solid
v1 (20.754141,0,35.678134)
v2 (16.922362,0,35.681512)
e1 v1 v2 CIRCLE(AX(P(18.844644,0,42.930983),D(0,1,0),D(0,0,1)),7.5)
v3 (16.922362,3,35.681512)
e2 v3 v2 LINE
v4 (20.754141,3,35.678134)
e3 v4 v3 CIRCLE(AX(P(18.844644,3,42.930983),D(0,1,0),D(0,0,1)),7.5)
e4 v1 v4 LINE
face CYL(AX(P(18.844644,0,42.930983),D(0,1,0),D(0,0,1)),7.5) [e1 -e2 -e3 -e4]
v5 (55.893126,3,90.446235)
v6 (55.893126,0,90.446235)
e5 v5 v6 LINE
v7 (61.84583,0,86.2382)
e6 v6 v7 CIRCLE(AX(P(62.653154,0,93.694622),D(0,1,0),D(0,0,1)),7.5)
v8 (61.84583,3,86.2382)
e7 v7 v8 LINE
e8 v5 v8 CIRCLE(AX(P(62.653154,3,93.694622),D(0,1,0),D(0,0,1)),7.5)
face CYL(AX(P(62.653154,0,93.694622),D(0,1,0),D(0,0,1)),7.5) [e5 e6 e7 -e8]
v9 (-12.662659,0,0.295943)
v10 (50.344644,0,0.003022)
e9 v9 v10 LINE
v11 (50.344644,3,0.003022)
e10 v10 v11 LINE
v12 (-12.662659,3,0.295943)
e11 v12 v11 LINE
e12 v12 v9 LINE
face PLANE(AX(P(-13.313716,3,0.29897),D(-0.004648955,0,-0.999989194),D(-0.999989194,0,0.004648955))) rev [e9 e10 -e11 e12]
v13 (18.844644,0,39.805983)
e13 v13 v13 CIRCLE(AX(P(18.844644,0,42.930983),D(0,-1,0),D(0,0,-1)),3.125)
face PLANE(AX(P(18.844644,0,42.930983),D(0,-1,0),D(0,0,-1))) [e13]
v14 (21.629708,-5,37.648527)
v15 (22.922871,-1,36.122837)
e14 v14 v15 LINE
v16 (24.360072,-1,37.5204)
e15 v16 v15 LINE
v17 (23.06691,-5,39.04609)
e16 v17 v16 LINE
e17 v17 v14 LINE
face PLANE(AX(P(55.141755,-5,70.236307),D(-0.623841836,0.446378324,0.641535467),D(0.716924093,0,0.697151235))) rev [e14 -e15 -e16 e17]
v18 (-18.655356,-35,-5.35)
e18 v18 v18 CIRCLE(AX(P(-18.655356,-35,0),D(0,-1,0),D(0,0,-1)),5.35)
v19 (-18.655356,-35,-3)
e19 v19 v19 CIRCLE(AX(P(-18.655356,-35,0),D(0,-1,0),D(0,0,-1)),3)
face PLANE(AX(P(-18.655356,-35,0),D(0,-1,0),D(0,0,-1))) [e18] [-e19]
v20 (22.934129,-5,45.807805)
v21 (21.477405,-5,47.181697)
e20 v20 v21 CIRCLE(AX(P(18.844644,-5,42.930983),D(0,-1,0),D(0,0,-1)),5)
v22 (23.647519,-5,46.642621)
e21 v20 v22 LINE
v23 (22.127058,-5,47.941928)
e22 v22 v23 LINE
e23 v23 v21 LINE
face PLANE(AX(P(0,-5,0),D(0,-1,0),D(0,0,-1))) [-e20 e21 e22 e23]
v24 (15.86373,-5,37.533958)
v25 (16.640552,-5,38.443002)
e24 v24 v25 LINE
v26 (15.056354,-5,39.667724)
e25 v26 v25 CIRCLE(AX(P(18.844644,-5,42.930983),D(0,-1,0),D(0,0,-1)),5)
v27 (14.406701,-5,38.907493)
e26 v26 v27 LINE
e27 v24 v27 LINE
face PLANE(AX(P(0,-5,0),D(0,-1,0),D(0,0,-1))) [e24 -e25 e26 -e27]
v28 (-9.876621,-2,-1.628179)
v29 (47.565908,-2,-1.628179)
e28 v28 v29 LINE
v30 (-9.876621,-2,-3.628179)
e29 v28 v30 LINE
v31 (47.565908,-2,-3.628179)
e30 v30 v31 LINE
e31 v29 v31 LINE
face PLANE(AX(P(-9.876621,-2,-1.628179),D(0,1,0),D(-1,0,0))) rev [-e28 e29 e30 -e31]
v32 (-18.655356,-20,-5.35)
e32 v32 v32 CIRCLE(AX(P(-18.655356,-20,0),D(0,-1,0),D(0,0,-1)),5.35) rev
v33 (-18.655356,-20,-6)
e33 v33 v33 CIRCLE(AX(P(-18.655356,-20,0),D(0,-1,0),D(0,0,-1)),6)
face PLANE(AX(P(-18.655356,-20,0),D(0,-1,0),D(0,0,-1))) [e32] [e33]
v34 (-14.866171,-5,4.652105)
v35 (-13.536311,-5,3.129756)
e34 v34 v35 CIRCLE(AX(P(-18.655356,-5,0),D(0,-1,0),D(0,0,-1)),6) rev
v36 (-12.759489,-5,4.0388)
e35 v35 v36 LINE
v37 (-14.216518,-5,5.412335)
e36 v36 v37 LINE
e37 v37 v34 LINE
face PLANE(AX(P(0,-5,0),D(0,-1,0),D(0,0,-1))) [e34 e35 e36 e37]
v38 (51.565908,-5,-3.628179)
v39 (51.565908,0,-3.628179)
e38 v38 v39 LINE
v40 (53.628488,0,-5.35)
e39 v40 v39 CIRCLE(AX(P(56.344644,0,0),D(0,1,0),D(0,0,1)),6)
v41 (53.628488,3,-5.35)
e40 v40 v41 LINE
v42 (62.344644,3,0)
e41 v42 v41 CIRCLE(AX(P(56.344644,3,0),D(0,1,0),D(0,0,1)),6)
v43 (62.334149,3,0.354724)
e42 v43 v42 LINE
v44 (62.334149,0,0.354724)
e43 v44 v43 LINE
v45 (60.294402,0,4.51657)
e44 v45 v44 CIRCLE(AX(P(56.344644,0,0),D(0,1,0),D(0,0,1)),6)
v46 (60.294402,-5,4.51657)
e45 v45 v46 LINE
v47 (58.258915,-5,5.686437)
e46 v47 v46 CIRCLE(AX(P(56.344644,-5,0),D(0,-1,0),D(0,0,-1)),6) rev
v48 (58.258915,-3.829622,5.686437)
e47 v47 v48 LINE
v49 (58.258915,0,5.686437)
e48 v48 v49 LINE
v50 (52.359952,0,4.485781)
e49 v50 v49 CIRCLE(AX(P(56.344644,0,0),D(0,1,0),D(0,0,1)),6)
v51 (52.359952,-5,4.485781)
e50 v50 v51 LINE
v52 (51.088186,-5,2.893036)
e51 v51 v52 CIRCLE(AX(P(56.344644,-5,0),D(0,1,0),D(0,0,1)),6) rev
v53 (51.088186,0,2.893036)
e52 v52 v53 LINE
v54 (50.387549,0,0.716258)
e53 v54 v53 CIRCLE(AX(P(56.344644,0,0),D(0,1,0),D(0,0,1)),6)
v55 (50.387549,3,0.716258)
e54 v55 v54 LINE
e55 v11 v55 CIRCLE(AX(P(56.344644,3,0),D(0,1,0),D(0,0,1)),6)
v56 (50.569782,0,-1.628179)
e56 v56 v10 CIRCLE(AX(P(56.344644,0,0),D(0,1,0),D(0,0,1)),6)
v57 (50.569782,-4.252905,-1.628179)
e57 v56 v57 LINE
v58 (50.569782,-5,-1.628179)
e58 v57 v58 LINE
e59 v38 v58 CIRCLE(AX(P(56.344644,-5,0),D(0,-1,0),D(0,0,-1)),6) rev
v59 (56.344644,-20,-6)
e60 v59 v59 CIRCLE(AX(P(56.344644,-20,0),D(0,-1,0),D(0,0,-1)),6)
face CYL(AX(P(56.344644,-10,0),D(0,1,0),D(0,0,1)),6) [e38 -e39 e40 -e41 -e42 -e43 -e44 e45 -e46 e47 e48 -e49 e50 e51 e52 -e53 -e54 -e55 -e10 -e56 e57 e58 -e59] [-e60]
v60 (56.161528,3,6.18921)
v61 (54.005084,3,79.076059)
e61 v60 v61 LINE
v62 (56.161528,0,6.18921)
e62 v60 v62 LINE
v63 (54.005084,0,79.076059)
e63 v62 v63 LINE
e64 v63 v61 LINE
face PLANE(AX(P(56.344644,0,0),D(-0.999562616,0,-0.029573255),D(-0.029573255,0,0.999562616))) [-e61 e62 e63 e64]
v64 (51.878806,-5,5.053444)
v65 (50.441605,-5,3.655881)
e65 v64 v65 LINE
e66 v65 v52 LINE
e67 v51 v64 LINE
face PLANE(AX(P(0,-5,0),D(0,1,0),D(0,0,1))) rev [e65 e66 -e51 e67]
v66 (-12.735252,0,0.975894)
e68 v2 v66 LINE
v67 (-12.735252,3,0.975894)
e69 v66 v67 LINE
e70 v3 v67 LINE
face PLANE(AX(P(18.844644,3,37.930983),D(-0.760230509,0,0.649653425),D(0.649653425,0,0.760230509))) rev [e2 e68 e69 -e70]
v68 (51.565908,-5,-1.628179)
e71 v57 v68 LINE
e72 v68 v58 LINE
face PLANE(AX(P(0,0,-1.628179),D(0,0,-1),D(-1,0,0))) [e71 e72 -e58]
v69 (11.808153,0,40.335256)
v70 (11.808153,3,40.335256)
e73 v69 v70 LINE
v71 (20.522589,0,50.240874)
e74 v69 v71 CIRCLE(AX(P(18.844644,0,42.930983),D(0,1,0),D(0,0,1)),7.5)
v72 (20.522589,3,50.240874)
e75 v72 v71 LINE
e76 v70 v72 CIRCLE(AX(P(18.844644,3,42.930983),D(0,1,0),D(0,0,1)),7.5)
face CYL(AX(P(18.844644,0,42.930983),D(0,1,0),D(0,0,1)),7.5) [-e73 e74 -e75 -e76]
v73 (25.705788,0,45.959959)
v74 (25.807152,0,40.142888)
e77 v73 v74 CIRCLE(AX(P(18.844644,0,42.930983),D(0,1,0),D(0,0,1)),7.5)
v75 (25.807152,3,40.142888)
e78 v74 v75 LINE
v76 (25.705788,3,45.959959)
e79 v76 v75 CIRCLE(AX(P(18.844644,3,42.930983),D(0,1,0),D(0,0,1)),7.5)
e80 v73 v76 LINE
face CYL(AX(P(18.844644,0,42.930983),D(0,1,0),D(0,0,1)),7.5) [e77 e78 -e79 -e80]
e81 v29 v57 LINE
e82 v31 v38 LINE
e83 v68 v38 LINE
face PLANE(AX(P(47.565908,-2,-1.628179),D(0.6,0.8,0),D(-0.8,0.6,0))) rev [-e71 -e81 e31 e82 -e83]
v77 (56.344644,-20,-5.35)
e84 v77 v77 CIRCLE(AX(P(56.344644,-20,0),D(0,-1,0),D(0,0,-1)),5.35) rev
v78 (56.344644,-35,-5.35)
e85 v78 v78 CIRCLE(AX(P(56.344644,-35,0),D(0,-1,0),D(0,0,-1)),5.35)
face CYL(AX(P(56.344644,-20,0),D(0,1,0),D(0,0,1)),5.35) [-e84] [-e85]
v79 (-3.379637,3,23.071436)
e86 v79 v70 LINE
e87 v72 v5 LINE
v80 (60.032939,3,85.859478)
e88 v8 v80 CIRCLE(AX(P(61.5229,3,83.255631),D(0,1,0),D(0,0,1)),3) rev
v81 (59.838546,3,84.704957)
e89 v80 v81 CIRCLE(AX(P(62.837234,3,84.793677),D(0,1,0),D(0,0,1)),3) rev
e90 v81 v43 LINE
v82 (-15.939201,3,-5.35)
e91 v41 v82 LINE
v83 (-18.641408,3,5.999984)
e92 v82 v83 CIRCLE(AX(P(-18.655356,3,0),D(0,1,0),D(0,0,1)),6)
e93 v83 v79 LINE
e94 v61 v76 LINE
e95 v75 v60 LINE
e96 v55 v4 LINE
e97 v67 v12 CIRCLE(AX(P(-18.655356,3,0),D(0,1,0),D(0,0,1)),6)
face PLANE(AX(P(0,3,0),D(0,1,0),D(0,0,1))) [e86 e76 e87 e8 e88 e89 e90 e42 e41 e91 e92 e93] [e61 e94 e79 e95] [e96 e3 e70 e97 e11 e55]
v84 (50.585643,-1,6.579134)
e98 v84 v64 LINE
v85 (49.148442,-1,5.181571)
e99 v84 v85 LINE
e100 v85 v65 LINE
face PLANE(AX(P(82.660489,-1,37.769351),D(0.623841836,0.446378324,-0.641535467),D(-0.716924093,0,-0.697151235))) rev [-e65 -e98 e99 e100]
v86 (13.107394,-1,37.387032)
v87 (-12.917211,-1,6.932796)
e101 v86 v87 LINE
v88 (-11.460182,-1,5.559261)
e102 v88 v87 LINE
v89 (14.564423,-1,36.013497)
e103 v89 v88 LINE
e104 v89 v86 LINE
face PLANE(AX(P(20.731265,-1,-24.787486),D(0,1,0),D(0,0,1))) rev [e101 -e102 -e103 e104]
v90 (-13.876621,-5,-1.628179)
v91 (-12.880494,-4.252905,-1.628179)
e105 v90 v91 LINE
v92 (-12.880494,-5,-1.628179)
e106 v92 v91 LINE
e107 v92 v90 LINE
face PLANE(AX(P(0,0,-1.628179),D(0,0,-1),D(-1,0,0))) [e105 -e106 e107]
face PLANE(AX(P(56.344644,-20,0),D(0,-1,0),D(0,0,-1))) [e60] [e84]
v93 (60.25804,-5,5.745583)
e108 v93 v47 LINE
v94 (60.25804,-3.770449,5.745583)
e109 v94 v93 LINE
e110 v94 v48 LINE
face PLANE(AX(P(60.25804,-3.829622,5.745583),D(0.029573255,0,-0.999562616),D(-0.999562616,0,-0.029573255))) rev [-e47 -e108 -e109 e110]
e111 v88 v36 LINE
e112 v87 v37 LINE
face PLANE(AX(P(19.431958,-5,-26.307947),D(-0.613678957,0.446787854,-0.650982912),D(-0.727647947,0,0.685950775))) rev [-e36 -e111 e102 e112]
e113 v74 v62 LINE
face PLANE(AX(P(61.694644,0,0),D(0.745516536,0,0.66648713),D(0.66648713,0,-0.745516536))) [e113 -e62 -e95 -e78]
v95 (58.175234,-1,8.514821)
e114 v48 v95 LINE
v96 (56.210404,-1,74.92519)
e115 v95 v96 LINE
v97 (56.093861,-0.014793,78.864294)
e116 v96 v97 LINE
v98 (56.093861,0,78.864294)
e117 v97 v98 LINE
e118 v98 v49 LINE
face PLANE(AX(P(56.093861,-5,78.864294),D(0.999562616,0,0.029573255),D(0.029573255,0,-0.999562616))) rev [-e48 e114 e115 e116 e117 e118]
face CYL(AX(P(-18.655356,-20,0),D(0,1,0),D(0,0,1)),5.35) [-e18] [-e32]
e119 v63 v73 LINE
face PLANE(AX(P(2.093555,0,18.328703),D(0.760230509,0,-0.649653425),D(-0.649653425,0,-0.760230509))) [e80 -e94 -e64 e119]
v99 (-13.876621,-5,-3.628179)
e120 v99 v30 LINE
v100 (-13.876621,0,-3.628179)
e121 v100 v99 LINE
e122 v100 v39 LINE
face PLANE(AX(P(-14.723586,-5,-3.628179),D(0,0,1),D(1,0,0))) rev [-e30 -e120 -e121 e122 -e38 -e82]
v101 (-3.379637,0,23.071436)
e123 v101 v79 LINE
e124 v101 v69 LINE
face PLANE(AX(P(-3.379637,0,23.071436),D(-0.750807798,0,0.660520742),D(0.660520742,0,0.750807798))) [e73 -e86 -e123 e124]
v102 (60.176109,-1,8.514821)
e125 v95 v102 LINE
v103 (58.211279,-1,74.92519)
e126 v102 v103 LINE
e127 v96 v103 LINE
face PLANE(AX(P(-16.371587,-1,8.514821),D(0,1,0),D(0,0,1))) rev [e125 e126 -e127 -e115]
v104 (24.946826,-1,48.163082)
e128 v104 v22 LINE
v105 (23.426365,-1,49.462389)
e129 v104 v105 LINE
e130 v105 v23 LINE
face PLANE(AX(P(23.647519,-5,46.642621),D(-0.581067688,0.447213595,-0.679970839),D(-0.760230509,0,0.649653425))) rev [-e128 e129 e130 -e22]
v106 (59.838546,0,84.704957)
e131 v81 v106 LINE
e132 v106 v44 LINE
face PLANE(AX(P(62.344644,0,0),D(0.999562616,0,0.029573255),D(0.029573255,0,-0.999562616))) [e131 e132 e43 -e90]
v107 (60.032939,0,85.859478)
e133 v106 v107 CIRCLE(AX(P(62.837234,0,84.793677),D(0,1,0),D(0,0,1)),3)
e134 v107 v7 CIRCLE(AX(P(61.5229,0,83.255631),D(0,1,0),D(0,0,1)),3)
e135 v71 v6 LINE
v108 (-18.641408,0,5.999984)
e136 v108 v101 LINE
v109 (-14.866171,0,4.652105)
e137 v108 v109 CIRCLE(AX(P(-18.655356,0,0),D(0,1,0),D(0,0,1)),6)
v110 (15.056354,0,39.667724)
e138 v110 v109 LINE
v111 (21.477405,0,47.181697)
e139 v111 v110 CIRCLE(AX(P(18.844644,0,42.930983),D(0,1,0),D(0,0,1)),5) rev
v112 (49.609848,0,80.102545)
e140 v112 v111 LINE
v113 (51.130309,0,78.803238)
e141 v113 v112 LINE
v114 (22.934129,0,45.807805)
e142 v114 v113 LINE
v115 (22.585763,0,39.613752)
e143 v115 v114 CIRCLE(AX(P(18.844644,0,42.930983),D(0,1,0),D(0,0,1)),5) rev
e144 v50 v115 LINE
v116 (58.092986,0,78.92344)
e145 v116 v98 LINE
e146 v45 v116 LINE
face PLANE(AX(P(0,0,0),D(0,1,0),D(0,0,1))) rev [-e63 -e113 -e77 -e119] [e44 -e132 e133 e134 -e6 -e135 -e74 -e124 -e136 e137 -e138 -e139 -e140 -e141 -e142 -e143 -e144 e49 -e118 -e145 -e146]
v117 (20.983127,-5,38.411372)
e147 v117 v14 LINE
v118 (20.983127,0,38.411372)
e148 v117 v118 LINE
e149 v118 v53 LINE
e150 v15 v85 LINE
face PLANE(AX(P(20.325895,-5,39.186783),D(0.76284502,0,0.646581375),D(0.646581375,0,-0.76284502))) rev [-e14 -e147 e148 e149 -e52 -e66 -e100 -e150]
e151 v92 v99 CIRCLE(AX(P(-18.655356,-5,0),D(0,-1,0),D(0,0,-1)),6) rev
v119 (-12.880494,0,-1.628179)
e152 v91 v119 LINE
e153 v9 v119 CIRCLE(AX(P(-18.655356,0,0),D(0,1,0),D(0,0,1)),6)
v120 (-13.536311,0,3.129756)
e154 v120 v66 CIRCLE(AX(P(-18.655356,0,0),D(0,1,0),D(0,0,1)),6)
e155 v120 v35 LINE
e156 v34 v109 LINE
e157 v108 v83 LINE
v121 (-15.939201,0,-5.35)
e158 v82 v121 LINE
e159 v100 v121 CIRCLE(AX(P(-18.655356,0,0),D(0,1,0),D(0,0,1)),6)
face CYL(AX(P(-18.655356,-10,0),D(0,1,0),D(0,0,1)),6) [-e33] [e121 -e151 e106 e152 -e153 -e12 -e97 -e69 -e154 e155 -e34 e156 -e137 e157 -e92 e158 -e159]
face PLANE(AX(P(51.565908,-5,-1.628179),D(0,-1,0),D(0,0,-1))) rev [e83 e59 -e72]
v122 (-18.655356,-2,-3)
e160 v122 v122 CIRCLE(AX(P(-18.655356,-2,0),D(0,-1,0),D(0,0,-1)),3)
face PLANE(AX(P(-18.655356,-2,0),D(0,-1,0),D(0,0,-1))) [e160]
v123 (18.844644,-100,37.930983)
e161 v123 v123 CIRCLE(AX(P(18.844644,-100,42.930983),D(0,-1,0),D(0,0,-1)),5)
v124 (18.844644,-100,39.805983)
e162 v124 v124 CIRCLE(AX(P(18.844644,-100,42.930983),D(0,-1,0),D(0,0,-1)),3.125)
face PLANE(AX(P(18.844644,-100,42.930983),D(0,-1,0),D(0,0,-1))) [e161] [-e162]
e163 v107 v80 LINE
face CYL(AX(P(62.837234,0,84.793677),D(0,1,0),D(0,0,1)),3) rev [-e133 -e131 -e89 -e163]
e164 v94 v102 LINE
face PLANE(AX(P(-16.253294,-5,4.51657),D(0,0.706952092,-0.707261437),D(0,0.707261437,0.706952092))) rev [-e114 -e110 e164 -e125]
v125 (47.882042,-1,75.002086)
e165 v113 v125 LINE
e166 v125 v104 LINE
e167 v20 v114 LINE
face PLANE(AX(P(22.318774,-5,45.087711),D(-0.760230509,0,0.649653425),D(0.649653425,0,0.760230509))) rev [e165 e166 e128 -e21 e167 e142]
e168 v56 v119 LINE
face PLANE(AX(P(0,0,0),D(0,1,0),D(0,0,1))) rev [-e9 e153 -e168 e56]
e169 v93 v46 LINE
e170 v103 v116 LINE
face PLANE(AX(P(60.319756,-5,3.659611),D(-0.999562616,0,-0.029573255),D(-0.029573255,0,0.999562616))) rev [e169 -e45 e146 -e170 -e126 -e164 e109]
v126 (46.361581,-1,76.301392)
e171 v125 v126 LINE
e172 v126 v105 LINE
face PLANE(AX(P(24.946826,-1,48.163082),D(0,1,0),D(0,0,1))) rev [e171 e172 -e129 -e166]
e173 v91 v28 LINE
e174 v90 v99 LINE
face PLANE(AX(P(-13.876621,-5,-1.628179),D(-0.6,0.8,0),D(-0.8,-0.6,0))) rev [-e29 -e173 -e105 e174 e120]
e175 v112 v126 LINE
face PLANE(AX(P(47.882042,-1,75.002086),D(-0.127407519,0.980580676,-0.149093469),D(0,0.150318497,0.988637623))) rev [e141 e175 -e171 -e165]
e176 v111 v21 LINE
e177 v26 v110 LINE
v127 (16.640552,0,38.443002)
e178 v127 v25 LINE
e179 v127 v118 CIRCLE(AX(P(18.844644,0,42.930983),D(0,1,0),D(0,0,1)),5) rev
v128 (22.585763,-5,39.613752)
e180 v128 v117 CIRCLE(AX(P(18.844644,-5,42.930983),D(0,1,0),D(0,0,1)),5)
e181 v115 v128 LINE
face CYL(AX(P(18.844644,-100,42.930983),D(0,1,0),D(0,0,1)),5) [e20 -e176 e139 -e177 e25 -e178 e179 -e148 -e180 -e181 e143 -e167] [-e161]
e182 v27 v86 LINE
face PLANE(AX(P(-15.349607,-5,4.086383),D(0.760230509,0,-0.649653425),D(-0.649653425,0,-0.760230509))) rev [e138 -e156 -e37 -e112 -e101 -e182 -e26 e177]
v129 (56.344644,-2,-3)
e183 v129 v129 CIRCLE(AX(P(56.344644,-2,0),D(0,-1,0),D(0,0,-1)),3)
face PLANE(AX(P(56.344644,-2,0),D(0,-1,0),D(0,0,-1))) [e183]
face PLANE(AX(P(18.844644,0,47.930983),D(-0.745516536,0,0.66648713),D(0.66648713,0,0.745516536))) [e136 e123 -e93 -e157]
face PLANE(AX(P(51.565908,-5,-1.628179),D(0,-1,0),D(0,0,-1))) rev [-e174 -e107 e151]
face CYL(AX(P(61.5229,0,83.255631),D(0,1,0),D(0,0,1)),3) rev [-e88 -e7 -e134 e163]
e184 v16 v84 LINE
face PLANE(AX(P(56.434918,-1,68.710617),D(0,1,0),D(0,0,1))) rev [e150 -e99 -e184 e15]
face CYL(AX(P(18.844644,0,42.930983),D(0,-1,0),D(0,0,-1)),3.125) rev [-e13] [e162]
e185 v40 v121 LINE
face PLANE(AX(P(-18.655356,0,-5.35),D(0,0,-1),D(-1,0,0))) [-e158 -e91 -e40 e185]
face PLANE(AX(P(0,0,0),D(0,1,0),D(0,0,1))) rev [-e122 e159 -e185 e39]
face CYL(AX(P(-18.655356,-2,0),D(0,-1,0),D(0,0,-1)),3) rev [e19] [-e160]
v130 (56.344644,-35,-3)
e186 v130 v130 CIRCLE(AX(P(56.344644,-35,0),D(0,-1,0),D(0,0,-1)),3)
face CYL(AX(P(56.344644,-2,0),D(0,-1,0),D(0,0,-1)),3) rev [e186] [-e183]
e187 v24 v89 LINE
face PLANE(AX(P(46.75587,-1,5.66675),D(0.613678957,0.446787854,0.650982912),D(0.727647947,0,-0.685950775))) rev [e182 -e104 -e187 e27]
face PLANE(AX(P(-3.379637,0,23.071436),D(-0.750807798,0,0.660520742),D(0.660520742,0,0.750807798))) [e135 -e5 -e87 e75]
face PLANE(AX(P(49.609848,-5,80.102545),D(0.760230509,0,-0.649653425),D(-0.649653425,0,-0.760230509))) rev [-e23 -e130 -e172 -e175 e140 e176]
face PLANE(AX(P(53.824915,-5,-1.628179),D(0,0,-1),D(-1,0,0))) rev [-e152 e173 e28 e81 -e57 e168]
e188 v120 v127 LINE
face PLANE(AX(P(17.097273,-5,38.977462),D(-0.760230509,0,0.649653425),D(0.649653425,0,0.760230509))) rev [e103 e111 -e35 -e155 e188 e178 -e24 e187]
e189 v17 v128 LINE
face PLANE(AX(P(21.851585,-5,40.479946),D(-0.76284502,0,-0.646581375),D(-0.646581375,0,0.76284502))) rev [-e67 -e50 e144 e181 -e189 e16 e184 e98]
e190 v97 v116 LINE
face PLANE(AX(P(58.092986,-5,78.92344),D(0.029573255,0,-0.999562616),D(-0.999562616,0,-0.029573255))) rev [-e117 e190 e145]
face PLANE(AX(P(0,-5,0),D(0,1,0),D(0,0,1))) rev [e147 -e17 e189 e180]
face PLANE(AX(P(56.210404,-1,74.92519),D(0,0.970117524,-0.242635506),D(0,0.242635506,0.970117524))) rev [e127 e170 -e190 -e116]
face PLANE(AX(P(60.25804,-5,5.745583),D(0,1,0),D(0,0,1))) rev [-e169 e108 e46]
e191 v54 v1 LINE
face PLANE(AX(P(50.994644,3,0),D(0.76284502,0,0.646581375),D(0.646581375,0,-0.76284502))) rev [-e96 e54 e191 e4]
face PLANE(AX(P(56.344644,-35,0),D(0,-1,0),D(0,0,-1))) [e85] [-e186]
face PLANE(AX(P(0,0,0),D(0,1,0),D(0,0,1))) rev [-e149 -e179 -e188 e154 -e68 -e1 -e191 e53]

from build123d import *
from build123d.topology import SkipClean

# Parameters (mm, degrees)
EXTRUDE_1_DEPTH     = 3
SKETCH_2_R          = 5.35
EXTRUDE_2_DEPTH     = 23
CUT_EXTRUDE_1_DEPTH = 3
SKETCH_4_R          = 5
EXTRUDE_3_DEPTH     = 100
EXTRUDE_START       = 3
SKETCH_5_R          = 5
EXTRUDE_4_DEPTH     = 3
SKETCH_6_R          = 5.35
EXTRUDE_5_DEPTH     = 5
SKETCH_7_R          = 5.35
EXTRUDE_6_DEPTH     = 5
SKETCH_8_W          = 75
SKETCH_8_H          = 10.7
EXTRUDE_7_DEPTH     = 3
EXTRUDE_8_DEPTH     = 3
CUT_EXTRUDE_2_DEPTH = 3
SKETCH_12_R         = 6
EXTRUDE_10_DEPTH    = 13
SKETCH_13_R         = 3
CUT_EXTRUDE_3_DEPTH = 23
SKETCH_14_R         = 3.125
CUT_EXTRUDE_5_DEPTH = 100
SKETCH_15_R         = 6
SKETCH_15_R_2       = 5.35
EXTRUDE_11_DEPTH    = 5
SKETCH_16_R         = 6
SKETCH_16_R_2       = 3
EXTRUDE_12_DEPTH    = 5
SKETCH_17_R         = 5.35
SKETCH_17_R_2       = 3
EXTRUDE_13_DEPTH    = 5
SKETCH_18_R         = 5.35
SKETCH_18_R_2       = 3
EXTRUDE_14_DEPTH    = 5
SKETCH_20_R         = 6
SKETCH_20_R_2       = 5.35
EXTRUDE_15_DEPTH    = 5
SKETCH_21_R         = 6
SKETCH_21_R_2       = 5.35
EXTRUDE_16_DEPTH    = 5
SKETCH_22_R         = 5.35
SKETCH_22_R_2       = 3
EXTRUDE_17_DEPTH    = 5
SKETCH_23_R         = 5.35
SKETCH_23_R_2       = 3
EXTRUDE_18_DEPTH    = 5
SKETCH_25_R         = 7.5
EXTRUDE_20_DEPTH    = 3
EXTRUDE_21_DEPTH    = 3
EXTRUDE_23_DEPTH    = 3
SKETCH_30_R         = 7.5
EXTRUDE_24_DEPTH    = 3
FILLET_1_R          = 3
EXTRUDE_29_DEPTH    = 5
EXTRUDE_31_DEPTH    = 2


with BuildPart() as part:
    # 草图1 → 凸台-拉伸1 (new body)
    with BuildSketch(Plane(origin=(0, 0, 0), x_dir=(1, 0, 0), z_dir=(0, 1, 0))):
        Polygon((-18.65535641, 0), (18.84464359, -42.930983399), (56.34464359, 0), align=None)
    extrude(amount=EXTRUDE_1_DEPTH)

    # 草图2 → 凸台-拉伸2 (add)
    with BuildSketch(Plane(origin=(0, 3, 0), x_dir=(1, 0, 0), z_dir=(0, 1, 0))):
        with Locations(Location((56.34464359, 0, 0), (0, 0, 270))):
            Circle(SKETCH_2_R)
        with Locations(Location((-18.65535641, 0, 0), (0, 0, 270))):
            Circle(SKETCH_2_R)
    extrude(amount=-EXTRUDE_2_DEPTH)

    # 草图3 → 切除-拉伸1 (cut)
    with BuildSketch(Plane.XZ):
        Polygon((8.632668758, 17.559374543), (1.15609776, 9), (33.75905687, 9), (36.53318942, 9), (29.056618422, 17.559374543), (18.84464359, 29.25031113), align=None)
    extrude(amount=-CUT_EXTRUDE_1_DEPTH, mode=Mode.SUBTRACT)

    # 草图4 → 凸台-拉伸3 (add)
    with BuildSketch(Plane.XZ):
        with Locations(Location((18.84464359, 42.930983399, 0), (0, 0, 228.862949093))):
            Circle(SKETCH_4_R)
    extrude(amount=EXTRUDE_3_DEPTH)

    # 草图5 → 凸台-拉伸4 (add)
    with BuildSketch(Plane(origin=(0, 0, 0), x_dir=(1, 0, 0), z_dir=(0, 1, 0)).offset(EXTRUDE_START)):
        with Locations(Location((18.84464359, -42.930983399, 0), (0, 0, 131.137050907))):
            Circle(SKETCH_5_R)
    extrude(amount=-EXTRUDE_4_DEPTH)

    # 草图6 → 凸台-拉伸5 (add)
    with SkipClean():  # the faces are left unmerged after this step: merging them gives an invalid solid
        with BuildSketch(Plane.XZ.offset(20)):
            with Locations(Location((56.34464359, 0, 0), (0, 0, 131.137050907))):
                Circle(SKETCH_6_R)
        extrude(amount=EXTRUDE_5_DEPTH)
    add(part.part.scale(1), mode=Mode.REPLACE)  # the faces are merged on a copy

    # 草图7 → 凸台-拉伸6 (add)
    with BuildSketch(Plane.XZ.offset(20)):
        with Locations(Location((-18.65535641, 0, 0), (0, 0, 48.862949093))):
            Circle(SKETCH_7_R)
    extrude(amount=EXTRUDE_6_DEPTH)

    # 草图8 → 凸台-拉伸7 (add)
    with SkipClean():  # the faces are left unmerged after this step: merging them gives an invalid solid
        with BuildSketch(Plane(origin=(0, 3, 0), x_dir=(1, 0, 0), z_dir=(0, 1, 0))):
            with Locations((18.84464359, 0)):
                Rectangle(SKETCH_8_W, SKETCH_8_H)
        extrude(amount=-EXTRUDE_7_DEPTH)

    # 草图9 → 凸台-拉伸8 (add)
    with SkipClean():  # the faces are left unmerged after this step: merging them gives an invalid solid
        with BuildSketch(Plane(origin=(0, 3, 0), x_dir=(1, 0, 0), z_dir=(0, 1, 0))):
            Polygon((61.69464359, 0), (18.84464359, -47.930983399), (-24.00535641, 0), align=None)
        extrude(amount=-EXTRUDE_8_DEPTH)

    # 草图10 → 切除-拉伸2 (cut)
    with SkipClean():  # the faces are left unmerged after this step: merging them gives an invalid solid
        with BuildSketch(Plane.XZ):
            Polygon((18.84464359, 37.930983399), (-13.313716495, 0.298969924), (50.99464359, 0), align=None)
        extrude(amount=-CUT_EXTRUDE_2_DEPTH, mode=Mode.SUBTRACT)

    # 草图12 → 凸台-拉伸10 (add)
    with SkipClean():  # the faces are left unmerged after this step: merging them gives an invalid solid
        with BuildSketch(Plane(origin=(0, 3, 0), x_dir=(1, 0, 0), z_dir=(0, 1, 0))):
            with Locations(Location((-18.65535641, 0, 0), (0, 0, 270))):
                Circle(SKETCH_12_R)
            with Locations(Location((56.34464359, 0, 0), (0, 0, 270))):
                Circle(SKETCH_12_R)
        extrude(amount=-EXTRUDE_10_DEPTH)

    # 草图13 → 切除-拉伸3 (cut)
    with SkipClean():  # the faces are left unmerged after this step: merging them gives an invalid solid
        with BuildSketch(Plane.XZ.offset(25)):
            with Locations(Location((-18.65535641, 0, 0), (0, 0, 270))):
                Circle(SKETCH_13_R)
            with Locations(Location((56.34464359, 0, 0), (0, 0, 270))):
                Circle(SKETCH_13_R)
        extrude(amount=-CUT_EXTRUDE_3_DEPTH, mode=Mode.SUBTRACT)

    # 草图14 → 切除-拉伸5 (cut)
    with SkipClean():  # the faces are left unmerged after this step: merging them gives an invalid solid
        with BuildSketch(Plane.XZ.offset(100)):
            with Locations(Location((18.84464359, 42.930983399, 0), (0, 0, 270))):
                Circle(SKETCH_14_R)
        extrude(amount=-CUT_EXTRUDE_5_DEPTH, mode=Mode.SUBTRACT)

    # 草图15 → 凸台-拉伸11 (add)
    with SkipClean():  # the faces are left unmerged after this step: merging them gives an invalid solid
        with BuildSketch(Plane.XZ.offset(10)):
            with Locations(Location((56.34464359, 0, 0), (0, 0, 90.133194259))):
                Circle(SKETCH_15_R)
            with Locations(Location((56.34464359, 0, 0), (0, 0, 270))):
                Circle(SKETCH_15_R_2, mode=Mode.SUBTRACT)
        extrude(amount=EXTRUDE_11_DEPTH)

    # 草图16 → 凸台-拉伸12 (add)
    with SkipClean():  # the faces are left unmerged after this step: merging them gives an invalid solid
        with BuildSketch(Plane.XZ.offset(10)):
            with Locations(Location((-18.65535641, 0, 0), (0, 0, 89.866805741))):
                Circle(SKETCH_16_R)
            with Locations(Location((-18.65535641, 0, 0), (0, 0, 270))):
                Circle(SKETCH_16_R_2, mode=Mode.SUBTRACT)
        extrude(amount=EXTRUDE_12_DEPTH)

    # 草图17 → 凸台-拉伸13 (add)
    with SkipClean():  # the faces are left unmerged after this step: merging them gives an invalid solid
        with BuildSketch(Plane.XZ.offset(25)):
            with Locations(Location((-18.65535641, 0, 0), (0, 0, 270))):
                Circle(SKETCH_17_R)
            with Locations(Location((-18.65535641, 0, 0), (0, 0, 270))):
                Circle(SKETCH_17_R_2, mode=Mode.SUBTRACT)
        extrude(amount=EXTRUDE_13_DEPTH)

    # 草图18 → 凸台-拉伸14 (add)
    with SkipClean():  # the faces are left unmerged after this step: merging them gives an invalid solid
        with BuildSketch(Plane.XZ.offset(25)):
            with Locations(Location((56.34464359, 0, 0), (0, 0, 270))):
                Circle(SKETCH_18_R)
            with Locations(Location((56.34464359, 0, 0), (0, 0, 270))):
                Circle(SKETCH_18_R_2, mode=Mode.SUBTRACT)
        extrude(amount=EXTRUDE_14_DEPTH)

    # 草图20 → 凸台-拉伸15 (add)
    with SkipClean():  # the faces are left unmerged after this step: merging them gives an invalid solid
        with BuildSketch(Plane.XZ.offset(15)):
            with Locations(Location((-18.65535641, 0, 0), (0, 0, 89.866805741))):
                Circle(SKETCH_20_R)
            with Locations(Location((-18.65535641, 0, 0), (0, 0, 270))):
                Circle(SKETCH_20_R_2, mode=Mode.SUBTRACT)
        extrude(amount=EXTRUDE_15_DEPTH)

    # 草图21 → 凸台-拉伸16 (add)
    with SkipClean():  # the faces are left unmerged after this step: merging them gives an invalid solid
        with BuildSketch(Plane.XZ.offset(15)):
            with Locations(Location((56.34464359, 0, 0), (0, 0, 90.133194259))):
                Circle(SKETCH_21_R)
            with Locations(Location((56.34464359, 0, 0), (0, 0, 270))):
                Circle(SKETCH_21_R_2, mode=Mode.SUBTRACT)
        extrude(amount=EXTRUDE_16_DEPTH)

    # 草图22 → 凸台-拉伸17 (add)
    with SkipClean():  # the faces are left unmerged after this step: merging them gives an invalid solid
        with BuildSketch(Plane.XZ.offset(30)):
            with Locations(Location((-18.65535641, 0, 0), (0, 0, 270))):
                Circle(SKETCH_22_R)
            with Locations(Location((-18.65535641, 0, 0), (0, 0, 270))):
                Circle(SKETCH_22_R_2, mode=Mode.SUBTRACT)
        extrude(amount=EXTRUDE_17_DEPTH)

    # 草图23 → 凸台-拉伸18 (add)
    with SkipClean():  # the faces are left unmerged after this step: merging them gives an invalid solid
        with BuildSketch(Plane.XZ.offset(30)):
            with Locations(Location((56.34464359, 0, 0), (0, 0, 270))):
                Circle(SKETCH_23_R)
            with Locations(Location((56.34464359, 0, 0), (0, 0, 270))):
                Circle(SKETCH_23_R_2, mode=Mode.SUBTRACT)
        extrude(amount=EXTRUDE_18_DEPTH)

    # 草图25 → 凸台-拉伸20 (add)
    with SkipClean():  # the faces are left unmerged after this step: merging them gives an invalid solid
        with BuildSketch(Plane(origin=(0, 3, 0), x_dir=(1, 0, 0), z_dir=(0, 1, 0))):
            with Locations((18.84464359, -42.930983399)):
                Circle(SKETCH_25_R)
        extrude(amount=-EXTRUDE_20_DEPTH)

    # 草图28 → 凸台-拉伸21 (add)
    with SkipClean():  # the faces are left unmerged after this step: merging them gives an invalid solid
        with BuildSketch(Plane(origin=(0, 3, 0), x_dir=(1, 0, 0), z_dir=(0, 1, 0))):
            Polygon((-3.379636645, -23.071435978), (2.093554995, -18.328702995), (68.652557408, -96.216669577), (66.868599364, -97.910067347), (64.321605904, -100.026810209), align=None)
        extrude(amount=-EXTRUDE_21_DEPTH)

    # 草图29 → 凸台-拉伸23 (add)
    with SkipClean():  # the faces are left unmerged after this step: merging them gives an invalid solid
        with BuildSketch(Plane(origin=(0, 3, 0), x_dir=(1, 0, 0), z_dir=(0, 1, 0))):
            Polygon((56.34464359, 0), (53.74105837, -88), (59.74105837, -88), (62.34464359, 0), align=None)
        extrude(amount=-EXTRUDE_23_DEPTH)

    # 草图30 → 凸台-拉伸24 (add)
    with SkipClean():  # the faces are left unmerged after this step: merging them gives an invalid solid
        with BuildSketch(Plane(origin=(0, 3, 0), x_dir=(1, 0, 0), z_dir=(0, 1, 0))):
            with Locations((62.6531538, -93.694621783)):
                Circle(SKETCH_30_R)
        extrude(amount=-EXTRUDE_24_DEPTH)

    # 圆角1
    # the kernel refuses this fillet: 3 mm, written as the material it adds along each edge
    with BuildSketch(Plane(origin=(60.387632696, 0, 86.544977448), x_dir=(-0.6496534253779116, 0, -0.760230509052844), z_dir=(0, 1, 0))) as fillet_1_piece_1:
        with BuildLine():
            CenterArc((1.763131122, -3), FILLET_1_R, 90, 55.663998218)
            ThreePointArc((-0.714100998, -1.307864951), (-0.324488751, -0.671711358), (0, 0))
            Line((0, 0), (1.763131122, 0))
        make_face()
    extrude(amount=3)
    with BuildSketch(Plane(origin=(59.804303017, 0, 85.862359607), x_dir=(0.02957325513951661, 0, -0.9995626156376863), z_dir=(0, 1, 0))) as fillet_1_piece_2:
        with BuildLine():
            CenterArc((FILLET_1_R * 0.38596961824, -FILLET_1_R), FILLET_1_R, 90, 42.210146514)
            Line((-FILLET_1_R * 0.285882149698, -FILLET_1_R * 0.259314370385), (0, 0))
            Line((0, 0), (FILLET_1_R * 0.38596961824, 0))
        make_face()
    extrude(amount=3)

    # 草图31 → 凸台-拉伸29 (add)
    with BuildSketch(Plane.XZ):
        Polygon((-14.723586471, -1.628179316), (-14.723586471, -3.628179316), (53.527409972, -3.628179316), (53.82491501, -1.628179316), align=None)
        Polygon((49.609847968, 80.102545011), (51.130308987, 78.80323816), (22.318773999, 45.087710689), (20.798312981, 46.38701754), align=None)
        Polygon((-15.349607435, 4.086383285), (-13.829146417, 2.787076434), (17.097273349, 38.977461836), (15.576812331, 40.276768687), align=None)
        Polygon((20.325894576, 39.186783249), (51.86894969, 1.971881231), (53.394639731, 3.265043982), (21.851584617, 40.479945999), align=None)
        Polygon((56.093860655, 78.864293565), (58.318881117, 3.659610745), (60.319756269, 3.659610745), (58.092985887, 78.923440075), align=None)
    extrude(amount=EXTRUDE_29_DEPTH)

    # 切除-扫描1: sweep along a path in 草图36
    with BuildLine(Plane.XZ.offset(5)) as sweep_1_path:
        Line((18.84464359, -3.628179316), (18.84464359, -1.628179316))
    # 草图35 → 切除-扫描1 (sweep, cut)
    with BuildSketch(Plane(origin=(0, 0, -3.628179316), x_dir=(-1, 0, 0), z_dir=(0, 0, -1))):
        Polygon((13.876620714, -5), (9.876620714, -2), (-47.565907894, -2), (-51.565907894, -5), align=None)
    sweep(path=sweep_1_path.line, mode=Mode.SUBTRACT)

    # 切除-扫描3: sweep along a path in 草图38
    with BuildLine(Plane.XZ.offset(5)) as sweep_3_path:
        Line((59.19369399, 41.720005215), (57.192818839, 41.720005215))
    # 草图37 → 切除-扫描3 (sweep, cut)
    with BuildSketch(Plane(origin=(60.375181238, 0, 1.786271926), x_dir=(0.029573255139513054, 0, -0.9995626156376864), z_dir=(0.9995626156376866, 0, 0.029573255139513057))):
        Polygon((-2.73149314, -5), (-6.73149314, -1), (-73.170921503, -1), (-77.170921503, -5), align=None)
    sweep(path=sweep_3_path.line, mode=Mode.SUBTRACT)

    # 草图39 → 凸台-拉伸31 (add)
    with BuildSketch(Plane(origin=(58.376056006, 0, 1.727125416), x_dir=(0.02957325513951297, 0, -0.9995626156376864), z_dir=(0.9995626156376866, 0, 0.029573255139512974))):
        Polygon((-3.961044, -3.829621531), (-3.961044, -5), (-2.73149314, -5), (-2.73149314, -4.501704435), (-3.961044, -3.272153575), align=None)
    extrude(amount=EXTRUDE_31_DEPTH)

    # 切除-扫描5: sweep along a path in 草图42
    with BuildLine(Plane.XZ.offset(5)) as sweep_5_path:
        Line((0.095091388, 22.159914171), (1.552120507, 20.786378718))
    # 草图40 → 切除-扫描5 (sweep, cut)
    with BuildSketch(Plane(origin=(-10.889521113, 0, 9.305617977), x_dir=(0.6496534253779145, 0, 0.7602305090528415), z_dir=(-0.7602305090528415, 0, 0.6496534253779145))):
        Polygon((-5.121187346, -5), (-3.121187346, -1), (36.9380259, -1), (38.9380259, -5), align=None)
    sweep(path=sweep_5_path.line, mode=Mode.SUBTRACT)

    # 切除-扫描6: sweep along a path in 草图44
    with BuildLine(Plane.XZ.offset(5)) as sweep_6_path:
        Line((36.035656698, 20.652203895), (37.472857905, 22.049766909))
    # 草图43 → 切除-扫描6 (sweep, cut)
    with BuildSketch(Plane(origin=(31.1568423, 0, 26.408291855), x_dir=(-0.6465813751887421, 0, 0.7628450204720715), z_dir=(-0.7628450204720715, 0, -0.6465813751887421))):
        Polygon((14.734624595, -5), (12.734624595, -1), (-27.825731715, -1), (-29.825731715, -5), align=None)
    sweep(path=sweep_6_path.line, mode=Mode.SUBTRACT)

    # 切除-扫描7: sweep along a path in 草图47
    with BuildLine(Plane.XZ.offset(5)) as sweep_7_path:
        Line((37.03221924, 62.305521799), (35.511758222, 63.60482865))
    # 草图46 → 切除-扫描7 (sweep, cut)
    with BuildSketch(Plane(origin=(-10.889521113, 0, 9.305617977), x_dir=(0.6496534253779142, 0, 0.7602305090528417), z_dir=(-0.7602305090528417, 0, 0.6496534253779142))):
        Polygon((50.821835343, -5), (52.821835343, -1), (88.125606235, -1), (93.125606235, 0), (93.125606235, -5), align=None)
    sweep(path=sweep_7_path.line, mode=Mode.SUBTRACT)

    # 切除-扫描8: sweep along a path in 草图49
    with BuildLine(Plane.XZ.offset(1)) as sweep_8_path:
        Line((58.211278907, 74.925189613), (56.210403756, 74.925189613))
        Line((56.210403756, 74.925189613), (55.379994456, 74.925189613))
    # 草图48 → 切除-扫描8 (sweep, cut)
    with BuildSketch(Plane(origin=(60.375181238, 0, 1.786271926), x_dir=(0.029573255139513054, 0, -0.9995626156376864), z_dir=(0.9995626156376866, 0, 0.029573255139513057))):
        Polygon((-73.170921503, -1), (-77.170921503, 0), (-77.170921503, -5), align=None)
    sweep(path=sweep_8_path.line, mode=Mode.SUBTRACT)


solid = part.part
